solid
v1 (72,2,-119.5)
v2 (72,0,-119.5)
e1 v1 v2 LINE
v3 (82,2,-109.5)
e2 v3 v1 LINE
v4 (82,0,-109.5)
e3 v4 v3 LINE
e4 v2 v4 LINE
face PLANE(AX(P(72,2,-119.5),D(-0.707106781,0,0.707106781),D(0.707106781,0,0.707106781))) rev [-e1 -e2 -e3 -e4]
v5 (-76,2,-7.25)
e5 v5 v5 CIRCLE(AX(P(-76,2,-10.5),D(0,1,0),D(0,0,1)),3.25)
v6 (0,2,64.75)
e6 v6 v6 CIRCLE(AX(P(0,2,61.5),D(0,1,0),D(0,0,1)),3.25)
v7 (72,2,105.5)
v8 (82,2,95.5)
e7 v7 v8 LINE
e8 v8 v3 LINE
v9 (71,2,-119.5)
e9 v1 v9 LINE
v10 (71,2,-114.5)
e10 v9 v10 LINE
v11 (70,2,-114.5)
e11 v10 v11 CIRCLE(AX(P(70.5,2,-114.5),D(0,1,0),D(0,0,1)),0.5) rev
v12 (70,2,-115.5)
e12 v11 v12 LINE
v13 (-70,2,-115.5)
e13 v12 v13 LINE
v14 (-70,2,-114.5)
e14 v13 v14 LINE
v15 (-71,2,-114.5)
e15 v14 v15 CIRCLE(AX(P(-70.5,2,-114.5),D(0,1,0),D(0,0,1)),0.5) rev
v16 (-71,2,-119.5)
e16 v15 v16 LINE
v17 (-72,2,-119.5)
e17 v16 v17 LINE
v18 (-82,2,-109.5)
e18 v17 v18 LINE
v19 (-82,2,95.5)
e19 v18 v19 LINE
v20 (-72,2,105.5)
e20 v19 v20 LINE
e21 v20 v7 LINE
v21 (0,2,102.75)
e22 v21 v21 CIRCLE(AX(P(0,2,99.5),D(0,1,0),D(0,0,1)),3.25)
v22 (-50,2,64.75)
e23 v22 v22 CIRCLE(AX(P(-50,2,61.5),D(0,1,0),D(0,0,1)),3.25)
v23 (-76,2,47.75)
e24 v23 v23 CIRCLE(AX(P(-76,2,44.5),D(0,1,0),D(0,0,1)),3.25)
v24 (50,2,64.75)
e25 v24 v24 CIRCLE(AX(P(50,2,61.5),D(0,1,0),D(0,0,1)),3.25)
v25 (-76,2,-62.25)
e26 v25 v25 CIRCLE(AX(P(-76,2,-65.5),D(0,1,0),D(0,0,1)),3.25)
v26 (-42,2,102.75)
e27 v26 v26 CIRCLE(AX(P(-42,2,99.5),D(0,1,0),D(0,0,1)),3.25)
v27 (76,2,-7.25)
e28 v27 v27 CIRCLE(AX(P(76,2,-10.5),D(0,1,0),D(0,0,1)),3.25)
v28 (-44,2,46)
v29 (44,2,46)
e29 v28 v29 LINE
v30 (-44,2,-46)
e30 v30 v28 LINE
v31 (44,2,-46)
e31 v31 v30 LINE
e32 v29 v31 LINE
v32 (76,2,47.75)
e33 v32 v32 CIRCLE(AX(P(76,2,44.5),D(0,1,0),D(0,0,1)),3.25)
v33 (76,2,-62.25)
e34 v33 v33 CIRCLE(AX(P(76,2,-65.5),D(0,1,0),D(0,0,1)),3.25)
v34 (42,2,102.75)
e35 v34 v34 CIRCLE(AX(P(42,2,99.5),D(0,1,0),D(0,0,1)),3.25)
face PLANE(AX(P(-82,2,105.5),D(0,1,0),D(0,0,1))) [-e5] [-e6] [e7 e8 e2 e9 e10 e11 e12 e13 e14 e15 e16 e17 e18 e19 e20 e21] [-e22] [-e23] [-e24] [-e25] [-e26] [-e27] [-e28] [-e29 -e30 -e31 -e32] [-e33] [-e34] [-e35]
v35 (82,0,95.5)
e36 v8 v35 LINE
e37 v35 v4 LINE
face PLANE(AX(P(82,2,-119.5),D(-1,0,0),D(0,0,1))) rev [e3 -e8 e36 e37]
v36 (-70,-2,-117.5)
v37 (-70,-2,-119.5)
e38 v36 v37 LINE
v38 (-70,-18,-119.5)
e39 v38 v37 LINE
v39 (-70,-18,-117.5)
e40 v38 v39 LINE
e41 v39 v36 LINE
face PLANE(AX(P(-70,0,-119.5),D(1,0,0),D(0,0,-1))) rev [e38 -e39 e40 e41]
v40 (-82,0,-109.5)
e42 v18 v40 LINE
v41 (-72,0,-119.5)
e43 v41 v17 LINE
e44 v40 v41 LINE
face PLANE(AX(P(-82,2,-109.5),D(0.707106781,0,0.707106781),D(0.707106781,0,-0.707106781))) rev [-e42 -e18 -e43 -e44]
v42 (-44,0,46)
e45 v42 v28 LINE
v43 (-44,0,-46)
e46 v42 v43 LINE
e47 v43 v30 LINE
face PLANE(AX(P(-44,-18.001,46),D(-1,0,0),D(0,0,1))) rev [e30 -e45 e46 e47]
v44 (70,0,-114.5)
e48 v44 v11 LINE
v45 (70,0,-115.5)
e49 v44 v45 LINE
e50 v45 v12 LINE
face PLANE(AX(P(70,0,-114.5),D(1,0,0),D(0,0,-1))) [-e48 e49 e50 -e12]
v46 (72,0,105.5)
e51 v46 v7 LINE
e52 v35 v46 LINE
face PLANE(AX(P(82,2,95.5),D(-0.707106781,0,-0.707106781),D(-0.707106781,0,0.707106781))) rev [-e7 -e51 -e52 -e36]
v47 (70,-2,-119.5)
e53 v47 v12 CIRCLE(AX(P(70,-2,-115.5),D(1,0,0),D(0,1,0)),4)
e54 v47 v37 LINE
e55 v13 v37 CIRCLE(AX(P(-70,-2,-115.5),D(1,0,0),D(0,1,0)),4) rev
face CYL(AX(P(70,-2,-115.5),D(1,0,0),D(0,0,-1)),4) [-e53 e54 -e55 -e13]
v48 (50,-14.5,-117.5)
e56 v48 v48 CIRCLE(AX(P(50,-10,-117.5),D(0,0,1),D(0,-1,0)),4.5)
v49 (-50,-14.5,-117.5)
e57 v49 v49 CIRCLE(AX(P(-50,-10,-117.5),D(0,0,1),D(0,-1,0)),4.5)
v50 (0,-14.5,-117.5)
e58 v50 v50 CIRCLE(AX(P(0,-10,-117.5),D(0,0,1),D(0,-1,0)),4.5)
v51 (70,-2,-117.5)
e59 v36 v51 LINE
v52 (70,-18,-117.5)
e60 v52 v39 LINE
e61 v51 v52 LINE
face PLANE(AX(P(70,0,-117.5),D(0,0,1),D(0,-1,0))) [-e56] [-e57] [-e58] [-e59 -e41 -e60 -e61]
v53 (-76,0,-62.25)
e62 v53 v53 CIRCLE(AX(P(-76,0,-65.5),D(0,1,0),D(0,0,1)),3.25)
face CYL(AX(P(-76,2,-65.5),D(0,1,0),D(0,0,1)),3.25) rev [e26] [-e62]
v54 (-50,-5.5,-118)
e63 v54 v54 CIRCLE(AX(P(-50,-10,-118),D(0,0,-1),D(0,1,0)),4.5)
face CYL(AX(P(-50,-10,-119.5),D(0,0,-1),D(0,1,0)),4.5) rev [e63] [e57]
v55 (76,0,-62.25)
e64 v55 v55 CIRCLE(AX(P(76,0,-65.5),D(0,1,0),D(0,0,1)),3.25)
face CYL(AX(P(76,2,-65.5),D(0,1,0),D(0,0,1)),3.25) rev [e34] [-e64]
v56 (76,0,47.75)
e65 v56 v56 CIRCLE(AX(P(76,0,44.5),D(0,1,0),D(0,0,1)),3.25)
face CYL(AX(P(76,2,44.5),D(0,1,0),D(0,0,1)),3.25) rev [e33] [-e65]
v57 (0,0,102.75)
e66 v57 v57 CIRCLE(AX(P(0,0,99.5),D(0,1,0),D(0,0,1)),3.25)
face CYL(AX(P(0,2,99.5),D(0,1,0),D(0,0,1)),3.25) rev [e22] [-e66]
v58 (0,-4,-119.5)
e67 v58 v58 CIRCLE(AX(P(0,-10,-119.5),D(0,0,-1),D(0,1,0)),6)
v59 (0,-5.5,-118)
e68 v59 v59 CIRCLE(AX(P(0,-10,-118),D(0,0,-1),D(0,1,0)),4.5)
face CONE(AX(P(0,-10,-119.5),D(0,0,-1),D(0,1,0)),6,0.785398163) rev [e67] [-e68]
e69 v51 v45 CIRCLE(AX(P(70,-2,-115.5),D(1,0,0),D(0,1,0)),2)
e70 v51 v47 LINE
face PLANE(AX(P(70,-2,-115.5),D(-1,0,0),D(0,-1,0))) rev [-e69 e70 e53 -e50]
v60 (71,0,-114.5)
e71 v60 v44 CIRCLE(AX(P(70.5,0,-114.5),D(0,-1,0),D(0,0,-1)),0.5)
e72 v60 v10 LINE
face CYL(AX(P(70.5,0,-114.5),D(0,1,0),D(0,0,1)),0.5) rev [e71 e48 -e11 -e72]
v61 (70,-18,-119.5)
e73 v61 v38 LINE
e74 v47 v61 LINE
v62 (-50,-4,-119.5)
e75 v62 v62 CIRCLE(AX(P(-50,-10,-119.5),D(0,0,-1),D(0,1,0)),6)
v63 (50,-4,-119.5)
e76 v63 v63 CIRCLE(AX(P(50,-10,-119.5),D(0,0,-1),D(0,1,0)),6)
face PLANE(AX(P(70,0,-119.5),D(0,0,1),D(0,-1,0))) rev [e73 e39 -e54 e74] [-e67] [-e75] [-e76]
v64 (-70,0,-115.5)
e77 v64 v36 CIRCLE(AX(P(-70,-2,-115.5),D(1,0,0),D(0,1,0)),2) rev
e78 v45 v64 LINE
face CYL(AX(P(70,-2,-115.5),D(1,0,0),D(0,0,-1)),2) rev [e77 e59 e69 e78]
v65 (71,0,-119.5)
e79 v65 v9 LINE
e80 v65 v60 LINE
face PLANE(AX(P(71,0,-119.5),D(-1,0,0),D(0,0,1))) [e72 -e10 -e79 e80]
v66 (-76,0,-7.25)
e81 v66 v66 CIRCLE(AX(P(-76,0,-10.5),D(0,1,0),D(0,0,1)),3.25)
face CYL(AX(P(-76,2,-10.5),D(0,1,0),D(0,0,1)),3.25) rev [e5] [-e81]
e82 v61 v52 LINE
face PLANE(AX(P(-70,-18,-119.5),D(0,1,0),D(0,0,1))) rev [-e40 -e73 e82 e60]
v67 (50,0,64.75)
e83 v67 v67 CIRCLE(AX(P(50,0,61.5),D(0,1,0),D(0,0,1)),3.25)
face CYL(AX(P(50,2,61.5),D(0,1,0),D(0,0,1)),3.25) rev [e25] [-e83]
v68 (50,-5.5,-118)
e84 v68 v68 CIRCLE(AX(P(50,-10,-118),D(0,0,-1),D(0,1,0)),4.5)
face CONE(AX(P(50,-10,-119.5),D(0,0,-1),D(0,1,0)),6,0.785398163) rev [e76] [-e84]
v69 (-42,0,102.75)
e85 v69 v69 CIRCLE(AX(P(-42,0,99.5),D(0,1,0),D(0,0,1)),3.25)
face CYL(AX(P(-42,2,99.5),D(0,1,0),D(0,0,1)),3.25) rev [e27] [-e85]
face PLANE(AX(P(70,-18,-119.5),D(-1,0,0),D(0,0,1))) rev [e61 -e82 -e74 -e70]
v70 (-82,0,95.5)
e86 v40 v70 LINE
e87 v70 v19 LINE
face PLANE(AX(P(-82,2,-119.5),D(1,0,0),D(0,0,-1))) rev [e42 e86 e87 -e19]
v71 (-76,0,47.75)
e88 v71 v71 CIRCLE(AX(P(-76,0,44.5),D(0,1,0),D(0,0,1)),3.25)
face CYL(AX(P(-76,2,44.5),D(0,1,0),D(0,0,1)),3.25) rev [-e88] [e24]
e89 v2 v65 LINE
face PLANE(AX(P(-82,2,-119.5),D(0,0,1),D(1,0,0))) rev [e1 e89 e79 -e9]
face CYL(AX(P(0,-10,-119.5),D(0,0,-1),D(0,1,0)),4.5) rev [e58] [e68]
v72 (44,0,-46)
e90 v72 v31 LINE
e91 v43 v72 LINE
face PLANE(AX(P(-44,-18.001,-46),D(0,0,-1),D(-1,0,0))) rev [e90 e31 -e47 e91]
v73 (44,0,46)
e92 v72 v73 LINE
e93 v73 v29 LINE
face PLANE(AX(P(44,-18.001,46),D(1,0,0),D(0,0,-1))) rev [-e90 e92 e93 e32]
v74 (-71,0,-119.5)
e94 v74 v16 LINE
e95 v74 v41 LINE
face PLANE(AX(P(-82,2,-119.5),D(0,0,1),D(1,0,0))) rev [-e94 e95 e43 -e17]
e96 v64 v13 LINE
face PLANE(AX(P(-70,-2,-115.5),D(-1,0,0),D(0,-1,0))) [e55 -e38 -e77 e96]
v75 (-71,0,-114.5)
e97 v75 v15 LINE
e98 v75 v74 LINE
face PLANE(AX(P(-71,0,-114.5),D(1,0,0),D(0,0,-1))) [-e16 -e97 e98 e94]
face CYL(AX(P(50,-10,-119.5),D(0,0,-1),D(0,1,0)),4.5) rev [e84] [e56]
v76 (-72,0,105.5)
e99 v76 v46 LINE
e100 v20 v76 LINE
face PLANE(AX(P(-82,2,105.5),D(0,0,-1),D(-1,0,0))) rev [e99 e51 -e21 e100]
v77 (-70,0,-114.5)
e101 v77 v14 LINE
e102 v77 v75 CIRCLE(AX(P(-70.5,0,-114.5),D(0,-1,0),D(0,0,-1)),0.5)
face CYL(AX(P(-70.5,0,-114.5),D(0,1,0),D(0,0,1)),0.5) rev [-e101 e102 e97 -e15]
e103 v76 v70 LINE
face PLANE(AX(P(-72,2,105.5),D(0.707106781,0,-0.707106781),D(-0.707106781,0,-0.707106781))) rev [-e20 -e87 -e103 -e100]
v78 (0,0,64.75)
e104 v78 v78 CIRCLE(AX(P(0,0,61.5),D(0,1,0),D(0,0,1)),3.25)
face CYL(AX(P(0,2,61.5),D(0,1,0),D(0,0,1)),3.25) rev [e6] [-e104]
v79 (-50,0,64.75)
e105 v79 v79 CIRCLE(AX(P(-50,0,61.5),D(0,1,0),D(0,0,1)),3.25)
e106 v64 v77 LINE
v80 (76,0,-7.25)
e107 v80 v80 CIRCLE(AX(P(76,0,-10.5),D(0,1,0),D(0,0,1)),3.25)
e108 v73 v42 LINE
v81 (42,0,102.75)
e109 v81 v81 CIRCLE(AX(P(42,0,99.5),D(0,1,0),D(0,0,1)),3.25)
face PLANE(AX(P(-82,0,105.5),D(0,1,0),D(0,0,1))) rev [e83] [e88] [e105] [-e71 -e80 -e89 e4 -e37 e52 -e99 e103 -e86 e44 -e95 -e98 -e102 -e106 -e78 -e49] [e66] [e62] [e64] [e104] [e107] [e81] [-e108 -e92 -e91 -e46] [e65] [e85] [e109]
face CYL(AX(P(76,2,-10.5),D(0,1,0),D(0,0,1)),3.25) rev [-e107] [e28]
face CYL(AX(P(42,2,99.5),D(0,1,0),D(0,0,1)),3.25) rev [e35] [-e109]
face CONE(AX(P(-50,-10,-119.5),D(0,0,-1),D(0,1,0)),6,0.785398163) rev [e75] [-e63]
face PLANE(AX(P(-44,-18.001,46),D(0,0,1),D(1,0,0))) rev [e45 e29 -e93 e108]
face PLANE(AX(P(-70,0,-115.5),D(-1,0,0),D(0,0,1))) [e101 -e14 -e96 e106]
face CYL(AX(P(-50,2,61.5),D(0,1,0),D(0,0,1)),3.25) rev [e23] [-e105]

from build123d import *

# Parameters (mm, degrees)
SKETCH_1_W                   = 164
SKETCH_1_H                   = 225
SM_BASE_FLANGE_1_DEPTH       = 2
SM_START                     = -2
SM_EDGE_FLANGE_1_DEPTH       = 5
SM_START_2                   = -18
SM_EDGE_FLANGE_1_2_OUTLINE_W = 140
SM_EDGE_FLANGE_1_2_OUTLINE_H = 2
SM_EDGE_FLANGE_1_2_DEPTH     = 16
SM_START_3                   = -70
SM_EDGE_FLANGE_1_3_DEPTH     = 140
SM_EDGE_FLANGE_1_4_DEPTH     = 140
HOLE_WIZARD_M61_AT_2_COUNT   = 2
HOLE_WIZARD_M61_AT_2_PITCH   = 50
HOLE_WIZARD_M61_AT_3_COUNT   = 2
HOLE_WIZARD_M61_AT_3_PITCH   = 50
HOLE_WIZARD_M61_2_D          = 6.5
CUT_EXTRUDE_1_REACH          = 148.302
SKETCH_10_W                  = 88
SKETCH_10_H                  = 92
CHAMFER_1_SIZE               = 10


with BuildPart() as part:
    # Базовая кромка1: sheet metal written as solids
    # Sketch 1 → Базовая кромка1 (new body)
    with BuildSketch(Plane(origin=(0, 0, 0), x_dir=(1, 0, 0), z_dir=(0, 1, 0))):
        with Locations((0, 7)):
            Rectangle(SKETCH_1_W, SKETCH_1_H)
    extrude(amount=SM_BASE_FLANGE_1_DEPTH)

    # Ребро-кромка1: read off the stored shape, not the designer's step
    # Ребро-кромка1 outline → Ребро-кромка1 (cut)
    with BuildSketch(Plane(origin=(0, 0, 0), x_dir=(1, 0, 0), z_dir=(0, 1, 0)).offset(SM_START)):
        with BuildLine():
            Line((-70, 114.5), (-70, 119.5))
            Line((-70, 119.5), (-71, 119.5))
            Line((-71, 119.5), (-71, 114.5))
            ThreePointArc((-71, 114.5), (-70.5, 114), (-70, 114.5))
        make_face()
        with BuildLine():
            Line((71, 119.5), (70, 119.5))
            Line((70, 119.5), (70, 114.5))
            ThreePointArc((70, 114.5), (70.5, 114), (71, 114.5))
            Line((71, 114.5), (71, 119.5))
        make_face()
    extrude(amount=SM_EDGE_FLANGE_1_DEPTH, mode=Mode.SUBTRACT)

    # Sm Edge Flange 1 3 outline → Sm Edge Flange 1 3 (cut)
    with BuildSketch(Plane.YZ.offset(SM_START_3)):
        with BuildLine():
            ThreePointArc((2, -115.5), (1.464101615, -117.5), (0, -118.964101616))
            Line((0, -118.964101616), (0, -119.5))
            Line((0, -119.5), (2, -119.5))
            Line((2, -119.5), (2, -115.5))
        make_face()
    extrude(amount=SM_EDGE_FLANGE_1_3_DEPTH, mode=Mode.SUBTRACT)



with BuildPart() as body_2:
    # Sm Edge Flange 1 2 outline → Sm Edge Flange 1 2 (new body)
    with BuildSketch(Plane(origin=(0, 0, 0), x_dir=(1, 0, 0), z_dir=(0, 1, 0)).offset(SM_START_2)):
        with Locations((0, 118.5)):
            Rectangle(SM_EDGE_FLANGE_1_2_OUTLINE_W, SM_EDGE_FLANGE_1_2_OUTLINE_H)
    extrude(amount=SM_EDGE_FLANGE_1_2_DEPTH)


with BuildPart() as part_1:
    add(part.part)

    add(body_2.part)  # Sm Edge Flange 1 4 merges body 2
    # Sm Edge Flange 1 4 outline → Sm Edge Flange 1 4 (add)
    with BuildSketch(Plane.YZ.offset(SM_START_3)):
        with BuildLine():
            Line((-2, -117.5), (-2, -119.5))
            ThreePointArc((-2, -119.5), (-0.96472382, -119.363703305), (0, -118.964101616))
            Line((0, -118.964101616), (0, -115.5))
            ThreePointArc((0, -115.5), (-0.585786438, -116.914213562), (-2, -117.5))
        make_face()
    extrude(amount=SM_EDGE_FLANGE_1_4_DEPTH)

    # Эскиз7 → Hole Wizard M61 (revolve, cut)
    with BuildSketch(Plane(origin=(0, -10, -119.5), x_dir=(0, 1, 0), z_dir=(1, 0, 0))):
        Polygon((0, 0), (0, 2), (4.5, 2), (4.5, 1.5), (6, 0), align=None)
    hole_wizard_m61 = revolve(axis=Axis((0, -10, -125.85), (0, 0, 1)), mode=Mode.SUBTRACT)

    # Hole Wizard M61 at 2: Hole Wizard M61 ×2
    with Locations(*[(i * HOLE_WIZARD_M61_AT_2_PITCH, 0, 0) for i in range(1, HOLE_WIZARD_M61_AT_2_COUNT)]):
        add(hole_wizard_m61, mode=Mode.SUBTRACT)

    # Hole Wizard M61 at 3: Hole Wizard M61 ×2
    with Locations(*[(-i * HOLE_WIZARD_M61_AT_3_PITCH, 0, 0) for i in range(1, HOLE_WIZARD_M61_AT_3_COUNT)]):
        add(hole_wizard_m61, mode=Mode.SUBTRACT)

    # Hole Wizard M61 2 (through all)
    with Locations(Plane(origin=(-76, 2, 44.5), x_dir=(0, 0, 1), z_dir=(0, 1, 0))):
        with Locations((0, 0), (-110, 0), (-110, 152), (0, 152), (17, 126), (17, 26), (55, 34), (55, 118), (55, 76), (17, 76), (-55, 152), (-55, 0)):
            Hole(HOLE_WIZARD_M61_2_D / 2)

    # Эскиз10 → Вытянуть1 (cut, up to next)
    with BuildSketch(Plane(origin=(0, 2, 0), x_dir=(1, 0, 0), z_dir=(0, 1, 0)), mode=Mode.PRIVATE) as cut_extrude_1_sk1:
        Rectangle(SKETCH_10_W, SKETCH_10_H)
    cut_extrude_1_tool1 = extrude(cut_extrude_1_sk1.sketch, amount=-CUT_EXTRUDE_1_REACH, mode=Mode.PRIVATE) & part_1.part
    add(cut_extrude_1_tool1.solids().sort_by_distance((0, 2, 0))[0], mode=Mode.SUBTRACT)

    # Фаска1
    chamfer_1_edges = [part_1.edges().sort_by_distance(p)[0] for p in [
        (-82, 1, -119.5),
        (82, 1, -119.5),
        (82, 1, 105.5),
        (-82, 1, 105.5),
    ]]
    chamfer(chamfer_1_edges, length=CHAMFER_1_SIZE)


solid = part_1.part
